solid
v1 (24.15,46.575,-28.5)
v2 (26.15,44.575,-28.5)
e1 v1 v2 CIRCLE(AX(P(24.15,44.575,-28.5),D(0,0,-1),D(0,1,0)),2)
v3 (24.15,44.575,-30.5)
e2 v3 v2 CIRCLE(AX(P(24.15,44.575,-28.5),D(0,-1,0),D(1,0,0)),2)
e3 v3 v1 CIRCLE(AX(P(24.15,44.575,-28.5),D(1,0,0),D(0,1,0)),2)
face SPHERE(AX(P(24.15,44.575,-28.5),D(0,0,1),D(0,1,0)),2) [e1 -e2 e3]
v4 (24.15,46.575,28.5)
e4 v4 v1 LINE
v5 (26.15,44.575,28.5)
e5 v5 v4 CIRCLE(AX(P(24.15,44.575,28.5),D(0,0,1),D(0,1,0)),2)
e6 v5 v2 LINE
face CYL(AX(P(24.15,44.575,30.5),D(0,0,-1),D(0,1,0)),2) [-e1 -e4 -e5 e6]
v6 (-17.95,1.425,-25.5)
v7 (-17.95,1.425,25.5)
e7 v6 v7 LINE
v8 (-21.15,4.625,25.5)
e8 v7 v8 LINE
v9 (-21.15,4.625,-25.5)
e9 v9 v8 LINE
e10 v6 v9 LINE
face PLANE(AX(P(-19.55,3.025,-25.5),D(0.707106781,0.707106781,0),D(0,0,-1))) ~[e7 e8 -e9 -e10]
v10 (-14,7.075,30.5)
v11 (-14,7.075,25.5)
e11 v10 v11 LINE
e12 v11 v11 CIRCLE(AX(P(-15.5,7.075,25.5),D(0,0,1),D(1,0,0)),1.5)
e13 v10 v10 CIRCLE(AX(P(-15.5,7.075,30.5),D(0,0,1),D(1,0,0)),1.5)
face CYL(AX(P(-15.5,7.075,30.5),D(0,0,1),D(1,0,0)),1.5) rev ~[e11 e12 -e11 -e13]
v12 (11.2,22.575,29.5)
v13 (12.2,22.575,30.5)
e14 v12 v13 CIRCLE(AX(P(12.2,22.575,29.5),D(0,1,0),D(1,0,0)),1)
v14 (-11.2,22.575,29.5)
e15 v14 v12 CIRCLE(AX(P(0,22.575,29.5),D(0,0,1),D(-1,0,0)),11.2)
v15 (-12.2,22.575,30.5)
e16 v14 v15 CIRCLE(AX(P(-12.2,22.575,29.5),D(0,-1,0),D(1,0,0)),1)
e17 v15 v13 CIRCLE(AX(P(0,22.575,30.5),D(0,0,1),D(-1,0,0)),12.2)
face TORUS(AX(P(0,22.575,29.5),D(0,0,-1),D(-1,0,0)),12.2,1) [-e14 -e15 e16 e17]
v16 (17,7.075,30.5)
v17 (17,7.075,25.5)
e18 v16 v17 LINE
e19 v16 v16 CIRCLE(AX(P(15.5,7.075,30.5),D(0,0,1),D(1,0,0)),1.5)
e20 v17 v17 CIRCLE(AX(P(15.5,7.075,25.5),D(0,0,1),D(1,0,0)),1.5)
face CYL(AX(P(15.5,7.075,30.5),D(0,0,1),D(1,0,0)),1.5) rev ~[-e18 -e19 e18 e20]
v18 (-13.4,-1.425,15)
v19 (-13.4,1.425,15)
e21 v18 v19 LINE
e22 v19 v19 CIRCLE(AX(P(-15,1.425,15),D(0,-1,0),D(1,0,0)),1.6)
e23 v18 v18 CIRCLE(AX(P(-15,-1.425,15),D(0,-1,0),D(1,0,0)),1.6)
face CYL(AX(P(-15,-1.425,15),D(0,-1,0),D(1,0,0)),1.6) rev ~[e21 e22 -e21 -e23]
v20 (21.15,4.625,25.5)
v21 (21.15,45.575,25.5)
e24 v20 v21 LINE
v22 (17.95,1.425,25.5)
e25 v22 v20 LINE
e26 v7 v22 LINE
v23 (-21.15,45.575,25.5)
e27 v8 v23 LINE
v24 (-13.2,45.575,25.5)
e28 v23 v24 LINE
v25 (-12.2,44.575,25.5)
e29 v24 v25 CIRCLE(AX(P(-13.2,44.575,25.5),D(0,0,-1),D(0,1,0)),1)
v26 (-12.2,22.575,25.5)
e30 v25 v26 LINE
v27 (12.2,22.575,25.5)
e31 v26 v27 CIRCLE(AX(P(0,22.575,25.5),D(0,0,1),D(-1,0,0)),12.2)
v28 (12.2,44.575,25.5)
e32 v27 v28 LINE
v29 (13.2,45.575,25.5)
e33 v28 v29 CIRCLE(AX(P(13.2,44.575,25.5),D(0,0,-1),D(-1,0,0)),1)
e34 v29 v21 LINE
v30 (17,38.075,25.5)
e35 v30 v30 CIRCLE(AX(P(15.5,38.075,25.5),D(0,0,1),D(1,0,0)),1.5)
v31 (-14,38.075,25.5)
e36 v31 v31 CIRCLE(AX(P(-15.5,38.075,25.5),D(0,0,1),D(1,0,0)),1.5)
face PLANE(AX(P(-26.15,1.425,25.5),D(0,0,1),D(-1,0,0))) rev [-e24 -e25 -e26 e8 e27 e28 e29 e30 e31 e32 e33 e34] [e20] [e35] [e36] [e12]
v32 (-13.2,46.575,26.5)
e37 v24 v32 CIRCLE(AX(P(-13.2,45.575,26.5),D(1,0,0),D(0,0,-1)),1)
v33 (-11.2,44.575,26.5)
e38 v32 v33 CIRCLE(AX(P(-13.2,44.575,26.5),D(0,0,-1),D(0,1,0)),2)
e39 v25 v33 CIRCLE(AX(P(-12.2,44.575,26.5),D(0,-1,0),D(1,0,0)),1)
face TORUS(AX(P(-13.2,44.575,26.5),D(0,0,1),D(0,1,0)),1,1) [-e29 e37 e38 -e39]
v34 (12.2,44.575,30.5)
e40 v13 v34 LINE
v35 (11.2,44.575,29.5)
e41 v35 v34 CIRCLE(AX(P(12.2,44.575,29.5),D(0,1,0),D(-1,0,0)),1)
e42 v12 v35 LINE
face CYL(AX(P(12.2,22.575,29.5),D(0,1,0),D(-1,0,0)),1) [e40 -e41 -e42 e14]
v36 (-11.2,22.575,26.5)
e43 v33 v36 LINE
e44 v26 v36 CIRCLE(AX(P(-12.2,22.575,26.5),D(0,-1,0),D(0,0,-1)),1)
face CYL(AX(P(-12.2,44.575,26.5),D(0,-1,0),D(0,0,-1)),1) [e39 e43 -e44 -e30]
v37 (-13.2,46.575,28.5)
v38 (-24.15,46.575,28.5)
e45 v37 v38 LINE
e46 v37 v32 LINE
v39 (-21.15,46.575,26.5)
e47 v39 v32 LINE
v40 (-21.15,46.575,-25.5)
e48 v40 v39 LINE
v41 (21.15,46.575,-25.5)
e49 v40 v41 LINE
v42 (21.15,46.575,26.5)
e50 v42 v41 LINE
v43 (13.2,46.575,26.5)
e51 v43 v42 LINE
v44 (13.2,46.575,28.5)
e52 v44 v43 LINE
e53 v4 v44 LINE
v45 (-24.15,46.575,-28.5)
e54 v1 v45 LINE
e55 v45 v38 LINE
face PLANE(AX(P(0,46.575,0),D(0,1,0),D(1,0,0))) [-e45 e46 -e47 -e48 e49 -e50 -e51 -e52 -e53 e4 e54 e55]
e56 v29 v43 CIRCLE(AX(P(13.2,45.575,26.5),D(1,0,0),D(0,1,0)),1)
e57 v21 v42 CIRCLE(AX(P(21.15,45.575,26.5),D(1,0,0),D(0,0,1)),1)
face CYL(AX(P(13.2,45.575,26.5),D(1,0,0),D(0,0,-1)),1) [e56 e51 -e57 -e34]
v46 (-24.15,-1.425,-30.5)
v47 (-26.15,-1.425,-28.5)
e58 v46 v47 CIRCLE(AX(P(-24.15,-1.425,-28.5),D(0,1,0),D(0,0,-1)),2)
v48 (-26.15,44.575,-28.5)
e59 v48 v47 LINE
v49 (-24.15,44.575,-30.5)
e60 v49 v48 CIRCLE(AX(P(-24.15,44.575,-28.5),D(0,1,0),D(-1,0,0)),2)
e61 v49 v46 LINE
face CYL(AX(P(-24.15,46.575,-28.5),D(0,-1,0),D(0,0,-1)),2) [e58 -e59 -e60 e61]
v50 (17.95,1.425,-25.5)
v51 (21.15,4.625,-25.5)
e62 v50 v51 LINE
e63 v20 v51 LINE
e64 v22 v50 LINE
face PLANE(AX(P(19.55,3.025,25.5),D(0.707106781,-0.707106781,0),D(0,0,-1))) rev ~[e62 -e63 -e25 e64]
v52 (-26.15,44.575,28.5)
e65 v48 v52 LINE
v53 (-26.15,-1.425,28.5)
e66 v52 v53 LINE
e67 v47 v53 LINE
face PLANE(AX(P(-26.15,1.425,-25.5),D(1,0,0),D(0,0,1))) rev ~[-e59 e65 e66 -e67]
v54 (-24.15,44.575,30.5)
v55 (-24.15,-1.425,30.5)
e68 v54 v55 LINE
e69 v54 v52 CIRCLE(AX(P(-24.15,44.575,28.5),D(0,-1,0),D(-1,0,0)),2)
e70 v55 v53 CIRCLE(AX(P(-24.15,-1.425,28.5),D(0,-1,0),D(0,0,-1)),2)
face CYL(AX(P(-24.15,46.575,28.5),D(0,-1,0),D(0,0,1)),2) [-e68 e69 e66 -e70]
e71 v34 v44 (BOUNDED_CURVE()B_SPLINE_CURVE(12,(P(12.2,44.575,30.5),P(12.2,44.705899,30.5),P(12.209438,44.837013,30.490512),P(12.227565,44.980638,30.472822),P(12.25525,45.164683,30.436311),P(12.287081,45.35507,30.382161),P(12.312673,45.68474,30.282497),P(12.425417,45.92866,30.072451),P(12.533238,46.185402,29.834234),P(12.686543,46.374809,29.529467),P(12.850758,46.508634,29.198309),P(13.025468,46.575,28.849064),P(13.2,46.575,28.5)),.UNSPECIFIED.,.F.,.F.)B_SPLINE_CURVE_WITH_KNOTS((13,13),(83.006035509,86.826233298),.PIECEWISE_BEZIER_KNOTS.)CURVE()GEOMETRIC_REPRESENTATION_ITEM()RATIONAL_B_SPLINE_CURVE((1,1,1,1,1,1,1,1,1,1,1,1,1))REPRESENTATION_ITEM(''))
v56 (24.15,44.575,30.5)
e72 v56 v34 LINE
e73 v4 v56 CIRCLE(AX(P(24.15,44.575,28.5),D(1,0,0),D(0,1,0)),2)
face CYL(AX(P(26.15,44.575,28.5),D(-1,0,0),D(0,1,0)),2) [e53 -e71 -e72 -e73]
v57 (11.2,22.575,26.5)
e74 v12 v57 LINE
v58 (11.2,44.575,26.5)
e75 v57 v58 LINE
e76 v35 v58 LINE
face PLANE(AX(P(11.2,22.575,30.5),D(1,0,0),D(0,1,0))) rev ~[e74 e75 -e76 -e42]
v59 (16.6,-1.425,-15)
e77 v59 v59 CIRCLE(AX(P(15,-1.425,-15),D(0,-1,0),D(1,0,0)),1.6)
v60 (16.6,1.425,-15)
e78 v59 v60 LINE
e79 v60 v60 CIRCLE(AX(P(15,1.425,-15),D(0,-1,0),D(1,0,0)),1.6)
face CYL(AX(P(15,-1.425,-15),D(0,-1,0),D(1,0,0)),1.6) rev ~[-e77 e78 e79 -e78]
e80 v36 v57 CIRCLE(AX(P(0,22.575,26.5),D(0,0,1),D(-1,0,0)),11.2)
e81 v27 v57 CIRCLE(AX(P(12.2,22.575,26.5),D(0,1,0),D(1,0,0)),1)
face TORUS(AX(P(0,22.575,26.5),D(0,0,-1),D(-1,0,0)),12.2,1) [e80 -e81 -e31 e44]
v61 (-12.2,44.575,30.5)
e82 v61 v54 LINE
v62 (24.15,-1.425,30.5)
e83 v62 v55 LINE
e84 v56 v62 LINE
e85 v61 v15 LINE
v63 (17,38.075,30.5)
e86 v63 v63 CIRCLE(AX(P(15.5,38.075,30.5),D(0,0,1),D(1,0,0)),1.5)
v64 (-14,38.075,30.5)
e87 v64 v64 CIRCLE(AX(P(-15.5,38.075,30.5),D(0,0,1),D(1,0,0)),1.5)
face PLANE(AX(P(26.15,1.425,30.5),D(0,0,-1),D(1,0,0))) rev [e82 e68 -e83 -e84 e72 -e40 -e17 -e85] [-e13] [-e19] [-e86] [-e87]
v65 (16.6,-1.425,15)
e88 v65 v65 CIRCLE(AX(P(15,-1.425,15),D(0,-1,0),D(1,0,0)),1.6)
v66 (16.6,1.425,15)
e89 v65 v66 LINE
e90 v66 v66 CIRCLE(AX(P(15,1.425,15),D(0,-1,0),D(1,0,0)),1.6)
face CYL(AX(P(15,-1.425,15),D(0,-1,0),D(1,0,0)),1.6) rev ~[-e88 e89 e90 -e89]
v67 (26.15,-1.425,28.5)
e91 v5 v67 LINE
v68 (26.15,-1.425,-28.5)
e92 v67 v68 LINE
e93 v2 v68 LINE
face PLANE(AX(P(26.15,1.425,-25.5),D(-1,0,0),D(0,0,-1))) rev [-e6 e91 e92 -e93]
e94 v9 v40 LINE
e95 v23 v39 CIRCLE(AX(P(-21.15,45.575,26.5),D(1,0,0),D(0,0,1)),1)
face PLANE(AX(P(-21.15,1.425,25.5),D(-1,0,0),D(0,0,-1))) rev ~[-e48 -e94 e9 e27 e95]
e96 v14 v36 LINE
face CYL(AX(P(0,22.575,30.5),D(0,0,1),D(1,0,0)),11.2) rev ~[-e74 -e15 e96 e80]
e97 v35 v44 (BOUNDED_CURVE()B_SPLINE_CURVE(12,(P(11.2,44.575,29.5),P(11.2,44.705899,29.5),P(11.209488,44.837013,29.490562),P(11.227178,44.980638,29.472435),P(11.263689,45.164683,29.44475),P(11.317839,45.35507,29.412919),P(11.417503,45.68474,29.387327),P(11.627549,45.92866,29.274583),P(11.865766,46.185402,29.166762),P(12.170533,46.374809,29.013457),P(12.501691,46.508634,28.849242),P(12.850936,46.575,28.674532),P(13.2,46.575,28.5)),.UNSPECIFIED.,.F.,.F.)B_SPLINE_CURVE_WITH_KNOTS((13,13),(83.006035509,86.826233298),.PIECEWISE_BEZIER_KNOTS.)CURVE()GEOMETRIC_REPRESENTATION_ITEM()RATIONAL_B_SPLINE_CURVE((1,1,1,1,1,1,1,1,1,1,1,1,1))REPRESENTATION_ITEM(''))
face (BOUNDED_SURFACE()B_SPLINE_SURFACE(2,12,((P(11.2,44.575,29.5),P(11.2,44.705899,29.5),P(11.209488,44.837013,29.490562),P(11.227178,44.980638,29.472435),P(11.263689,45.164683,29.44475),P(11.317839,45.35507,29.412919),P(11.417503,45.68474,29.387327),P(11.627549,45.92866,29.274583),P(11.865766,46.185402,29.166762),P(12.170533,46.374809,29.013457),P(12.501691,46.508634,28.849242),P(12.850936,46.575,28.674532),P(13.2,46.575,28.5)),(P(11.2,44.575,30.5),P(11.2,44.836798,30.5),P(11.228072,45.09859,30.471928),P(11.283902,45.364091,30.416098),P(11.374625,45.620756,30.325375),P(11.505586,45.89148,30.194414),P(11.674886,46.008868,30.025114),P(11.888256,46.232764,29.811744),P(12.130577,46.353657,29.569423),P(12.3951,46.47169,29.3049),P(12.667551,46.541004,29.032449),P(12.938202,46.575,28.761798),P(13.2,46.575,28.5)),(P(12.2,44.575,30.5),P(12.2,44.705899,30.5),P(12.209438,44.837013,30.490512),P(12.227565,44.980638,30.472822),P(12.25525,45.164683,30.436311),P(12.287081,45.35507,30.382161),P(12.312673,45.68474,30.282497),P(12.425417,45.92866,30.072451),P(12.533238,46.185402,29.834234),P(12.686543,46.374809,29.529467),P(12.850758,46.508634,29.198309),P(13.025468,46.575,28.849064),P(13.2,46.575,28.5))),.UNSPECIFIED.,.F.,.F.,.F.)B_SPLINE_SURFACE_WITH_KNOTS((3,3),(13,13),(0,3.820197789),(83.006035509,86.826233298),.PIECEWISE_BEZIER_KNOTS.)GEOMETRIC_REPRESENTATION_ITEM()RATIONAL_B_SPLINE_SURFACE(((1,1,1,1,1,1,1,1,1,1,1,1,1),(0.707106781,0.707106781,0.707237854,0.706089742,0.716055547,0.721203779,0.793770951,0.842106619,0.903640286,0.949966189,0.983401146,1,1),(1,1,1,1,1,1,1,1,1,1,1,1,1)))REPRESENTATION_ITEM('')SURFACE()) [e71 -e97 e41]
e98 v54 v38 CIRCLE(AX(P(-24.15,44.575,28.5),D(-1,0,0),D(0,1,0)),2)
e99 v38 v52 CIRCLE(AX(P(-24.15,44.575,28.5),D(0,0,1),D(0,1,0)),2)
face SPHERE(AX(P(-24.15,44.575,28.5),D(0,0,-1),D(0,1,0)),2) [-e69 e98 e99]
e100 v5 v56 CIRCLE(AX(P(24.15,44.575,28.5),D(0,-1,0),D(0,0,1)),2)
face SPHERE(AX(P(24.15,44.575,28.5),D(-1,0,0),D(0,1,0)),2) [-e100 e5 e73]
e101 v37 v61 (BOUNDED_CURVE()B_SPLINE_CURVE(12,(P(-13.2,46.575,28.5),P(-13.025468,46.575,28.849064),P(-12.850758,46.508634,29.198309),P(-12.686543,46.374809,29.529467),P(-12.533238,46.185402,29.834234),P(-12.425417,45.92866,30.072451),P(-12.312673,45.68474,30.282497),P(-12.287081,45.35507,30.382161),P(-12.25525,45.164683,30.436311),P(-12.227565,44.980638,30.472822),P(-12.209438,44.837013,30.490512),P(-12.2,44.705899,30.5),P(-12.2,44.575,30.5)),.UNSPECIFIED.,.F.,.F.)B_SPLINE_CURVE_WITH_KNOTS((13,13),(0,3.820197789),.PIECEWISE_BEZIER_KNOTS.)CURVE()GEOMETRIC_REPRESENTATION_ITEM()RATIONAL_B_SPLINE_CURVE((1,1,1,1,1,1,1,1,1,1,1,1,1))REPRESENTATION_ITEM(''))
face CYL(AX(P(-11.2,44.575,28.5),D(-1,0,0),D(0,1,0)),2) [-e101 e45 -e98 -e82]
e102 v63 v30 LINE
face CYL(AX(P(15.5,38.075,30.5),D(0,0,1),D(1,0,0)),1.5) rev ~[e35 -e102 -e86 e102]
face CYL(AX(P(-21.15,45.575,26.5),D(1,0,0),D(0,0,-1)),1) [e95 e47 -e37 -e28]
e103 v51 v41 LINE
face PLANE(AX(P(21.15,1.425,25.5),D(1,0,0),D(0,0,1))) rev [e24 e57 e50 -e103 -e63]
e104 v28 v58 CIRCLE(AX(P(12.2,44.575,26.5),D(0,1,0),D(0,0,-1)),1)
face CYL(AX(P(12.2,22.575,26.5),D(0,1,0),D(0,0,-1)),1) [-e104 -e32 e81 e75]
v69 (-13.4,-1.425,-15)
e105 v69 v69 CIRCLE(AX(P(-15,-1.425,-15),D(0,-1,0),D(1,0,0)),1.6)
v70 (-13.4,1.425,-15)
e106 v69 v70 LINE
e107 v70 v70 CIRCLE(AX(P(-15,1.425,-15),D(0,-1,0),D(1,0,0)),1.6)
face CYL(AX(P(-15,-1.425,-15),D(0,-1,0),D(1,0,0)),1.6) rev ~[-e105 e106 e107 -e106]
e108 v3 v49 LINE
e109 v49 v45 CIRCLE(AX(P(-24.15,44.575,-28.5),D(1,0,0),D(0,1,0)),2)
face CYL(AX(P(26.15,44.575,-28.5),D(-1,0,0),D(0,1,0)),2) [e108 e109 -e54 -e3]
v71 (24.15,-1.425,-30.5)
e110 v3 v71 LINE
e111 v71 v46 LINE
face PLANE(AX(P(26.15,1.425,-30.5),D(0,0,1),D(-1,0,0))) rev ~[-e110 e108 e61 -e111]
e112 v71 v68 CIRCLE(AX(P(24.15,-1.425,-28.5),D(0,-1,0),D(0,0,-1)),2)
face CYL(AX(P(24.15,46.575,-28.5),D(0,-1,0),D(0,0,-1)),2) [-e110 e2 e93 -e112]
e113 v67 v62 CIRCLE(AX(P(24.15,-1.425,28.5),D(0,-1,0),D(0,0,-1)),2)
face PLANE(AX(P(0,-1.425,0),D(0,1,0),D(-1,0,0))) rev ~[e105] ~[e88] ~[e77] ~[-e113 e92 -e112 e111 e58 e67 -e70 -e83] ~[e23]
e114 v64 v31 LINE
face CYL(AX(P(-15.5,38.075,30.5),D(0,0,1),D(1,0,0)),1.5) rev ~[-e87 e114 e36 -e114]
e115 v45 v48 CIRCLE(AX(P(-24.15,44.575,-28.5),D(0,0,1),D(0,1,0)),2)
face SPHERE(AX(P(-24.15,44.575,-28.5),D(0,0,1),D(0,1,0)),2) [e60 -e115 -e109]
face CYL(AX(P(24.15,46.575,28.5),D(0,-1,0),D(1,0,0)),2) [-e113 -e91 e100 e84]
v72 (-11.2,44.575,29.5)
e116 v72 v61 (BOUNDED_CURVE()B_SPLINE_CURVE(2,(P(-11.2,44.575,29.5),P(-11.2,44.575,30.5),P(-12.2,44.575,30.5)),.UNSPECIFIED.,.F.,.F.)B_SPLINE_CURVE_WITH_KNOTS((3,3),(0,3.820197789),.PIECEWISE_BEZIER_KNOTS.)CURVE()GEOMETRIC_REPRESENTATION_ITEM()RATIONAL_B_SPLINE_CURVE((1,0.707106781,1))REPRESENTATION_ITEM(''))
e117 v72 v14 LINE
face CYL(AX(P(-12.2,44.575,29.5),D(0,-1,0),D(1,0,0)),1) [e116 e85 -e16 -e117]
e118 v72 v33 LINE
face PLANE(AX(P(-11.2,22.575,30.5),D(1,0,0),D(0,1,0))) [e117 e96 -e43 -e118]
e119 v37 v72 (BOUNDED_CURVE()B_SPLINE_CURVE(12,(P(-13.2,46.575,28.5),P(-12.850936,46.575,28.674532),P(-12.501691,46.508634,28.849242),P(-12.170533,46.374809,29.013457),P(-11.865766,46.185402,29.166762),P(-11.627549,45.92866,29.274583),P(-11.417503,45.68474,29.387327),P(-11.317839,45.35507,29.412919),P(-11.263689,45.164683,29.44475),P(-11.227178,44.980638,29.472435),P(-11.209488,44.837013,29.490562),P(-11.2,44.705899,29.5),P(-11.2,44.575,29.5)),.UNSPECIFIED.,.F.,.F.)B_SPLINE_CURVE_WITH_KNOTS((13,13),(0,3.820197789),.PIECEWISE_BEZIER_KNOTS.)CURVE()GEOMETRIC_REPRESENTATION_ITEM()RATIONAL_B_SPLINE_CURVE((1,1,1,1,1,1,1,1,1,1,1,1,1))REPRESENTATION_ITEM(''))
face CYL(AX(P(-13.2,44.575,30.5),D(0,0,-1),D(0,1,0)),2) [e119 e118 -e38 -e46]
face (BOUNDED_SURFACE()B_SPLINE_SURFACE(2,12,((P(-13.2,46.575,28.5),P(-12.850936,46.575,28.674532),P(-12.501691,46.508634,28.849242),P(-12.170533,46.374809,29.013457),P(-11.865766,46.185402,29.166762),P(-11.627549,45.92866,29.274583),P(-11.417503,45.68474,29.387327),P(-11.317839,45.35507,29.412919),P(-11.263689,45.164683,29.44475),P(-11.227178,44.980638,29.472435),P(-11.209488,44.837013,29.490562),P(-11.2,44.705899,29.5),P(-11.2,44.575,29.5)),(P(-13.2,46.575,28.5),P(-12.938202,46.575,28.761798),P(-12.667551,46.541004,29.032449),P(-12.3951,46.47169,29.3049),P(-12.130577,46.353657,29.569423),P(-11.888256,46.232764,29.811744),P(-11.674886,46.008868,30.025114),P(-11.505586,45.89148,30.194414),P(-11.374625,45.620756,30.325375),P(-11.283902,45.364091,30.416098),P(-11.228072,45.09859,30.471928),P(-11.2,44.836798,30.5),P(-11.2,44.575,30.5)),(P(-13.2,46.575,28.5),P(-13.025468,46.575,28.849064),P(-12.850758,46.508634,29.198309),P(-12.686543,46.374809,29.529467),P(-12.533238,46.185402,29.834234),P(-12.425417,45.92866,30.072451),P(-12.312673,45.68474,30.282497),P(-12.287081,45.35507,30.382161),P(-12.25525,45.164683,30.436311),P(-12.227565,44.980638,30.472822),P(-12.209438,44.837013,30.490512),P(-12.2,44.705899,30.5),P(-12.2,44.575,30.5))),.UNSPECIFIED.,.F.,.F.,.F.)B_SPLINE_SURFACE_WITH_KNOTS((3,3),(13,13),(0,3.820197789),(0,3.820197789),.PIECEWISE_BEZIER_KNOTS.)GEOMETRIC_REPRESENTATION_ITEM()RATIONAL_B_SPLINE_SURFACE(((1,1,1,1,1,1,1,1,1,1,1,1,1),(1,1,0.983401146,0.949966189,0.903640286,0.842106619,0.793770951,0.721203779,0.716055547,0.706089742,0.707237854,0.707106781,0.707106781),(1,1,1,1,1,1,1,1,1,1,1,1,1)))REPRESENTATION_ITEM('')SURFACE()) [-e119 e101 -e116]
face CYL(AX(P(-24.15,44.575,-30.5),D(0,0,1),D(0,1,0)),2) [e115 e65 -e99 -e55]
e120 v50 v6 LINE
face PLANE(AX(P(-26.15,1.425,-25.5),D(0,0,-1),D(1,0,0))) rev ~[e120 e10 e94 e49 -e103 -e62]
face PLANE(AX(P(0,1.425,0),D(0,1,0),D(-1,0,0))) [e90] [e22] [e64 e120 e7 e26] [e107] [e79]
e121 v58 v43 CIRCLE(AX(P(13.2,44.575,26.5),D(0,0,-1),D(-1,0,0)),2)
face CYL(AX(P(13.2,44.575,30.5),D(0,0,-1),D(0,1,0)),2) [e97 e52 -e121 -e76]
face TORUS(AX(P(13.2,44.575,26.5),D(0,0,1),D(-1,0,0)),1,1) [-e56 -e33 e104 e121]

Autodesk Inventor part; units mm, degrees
sketch "Эскиз1" plane through (0, 0, 0) normal (0, 1, 0) x (-1, 0, 0)
  line L0 (21.15, 25.5) -> (-21.15, 25.5)
  line L1 (-21.15, 25.5) -> (-21.15, -25.5)
  line L2 (-21.15, -25.5) -> (21.15, -25.5)
  line L3 (21.15, -25.5) -> (21.15, 25.5)
  line L4 (21.15, 25.5) -> (-21.15, -25.5) construction
  line L5 (-21.15, 25.5) -> (21.15, -25.5) construction
  point P0 (0, 0)
  dimension "d2" = 51
  dimension "d3" = 42.3
extrude "Выдавливание1" add sketch "Эскиз1" along normal mid plane 2.85
sketch "Эскиз2" plane through (0, 1.425, 0) normal (0, 1, 0) x (1, 0, 0)
  line L0 (-21.15, -25.5) -> (-21.15, 25.5) projected
  line L1 (-21.15, 25.5) -> (-26.15, 25.5)
  line L2 (-26.15, 25.5) -> (-26.15, -25.5)
  line L3 (-26.15, -25.5) -> (-21.15, -25.5)
  line L4 (-21.15, -25.5) -> (-21.15, 25.5)
  point P0 (0, 0)
  dimension "d4" = 5
extrude "Выдавливание2" add sketch "Эскиз2" along normal blind 45.15 and the other way blind 2.85
mirror "Зеркальное отражение1" about plane through (0, 0, 0) normal (1, 0, 0) of "Выдавливание2"
chamfer "Фаска1" distance 3.2 angle 45 2 edges at (-21.15, 1.425, 0) (21.15, 1.425, 0)
sketch "Эскиз3" plane through (0, 1.425, 0) normal (0, 1, 0) x (1, 0, 0)
  line L0 (-26.15, 25.5) -> (26.15, 25.5) projected
  line L1 (-26.15, 25.5) -> (26.15, 25.5)
  line L2 (26.15, 25.5) -> (26.15, 30.5)
  line L3 (26.15, 30.5) -> (-26.15, 30.5)
  line L4 (-26.15, 30.5) -> (-26.15, 25.5)
  point P0 (0, 0)
  dimension "d17" = 5
extrude "Выдавливание3" add sketch "Эскиз3" along normal blind 45.15 and the other way blind 2.85
mirror "Зеркальное отражение2" about plane through (0, 0, 0) normal (0, 0, 1) of "Выдавливание3"
sketch "Эскиз7" plane through (-26.15, -1.425, 30.5) normal (0, 0, 1) x (1, 0, 0)
  circle A0 centre (26.15, 24) radius 11 projected
  circle A1 centre (26.15, 24) radius 11.2
  point P0 (26.15, 1.425)
  dimension "d22" = 22.4
extrude "Выдавливание5" cut sketch "Эскиз7" against normal up to next contours A0 | A1
sketch "Эскиз8" plane through (-26.15, -1.425, 30.5) normal (0, 0, 1) x (1, 0, 0)
  circle A0 centre (26.15, 24) radius 11.2 projected
  line L0 (14.95, 24) -> (14.95, 48)
  line L1 (5, 48) -> (47.3, 48) projected
  line L2 (37.35, 24) -> (37.35, 48.1316)
  point P0 (26.15, 1.425)
  point P1 (37.35, 48)
  dimension "d23" = 22.4
extrude "Выдавливание6" cut sketch "Эскиз8" against normal up to next contours A0 L0 L1 L2
fillet "Сопряжение1" radius 2 11 edges at (-11.2, 46.575, 28) (11.2, 46.575, 28) (-26.15, 46.575, 0) (-18.675, 46.575, 30.5) (18.675, 46.575, 30.5) (26.15, 46.575, 0) (0, 46.575, -30.5) (26.15, 22.575, 30.5) (-26.15, 22.575, 30.5) (-26.15, 22.575, -30.5) (26.15, 22.575, -30.5)
fillet "Сопряжение2" radius 1 12 edges at (0, 11.375, 25.5) (11.2, 33.575, 25.5) (11.7858, 45.9892, 25.5) (17.175, 46.575, 25.5) (-11.7858, 45.9892, 25.5) (-17.175, 46.575, 25.5) (-11.2, 33.575, 25.5) (-11.7858, 45.9892, 29.9142) (0, 11.375, 30.5) (11.2, 33.575, 30.5) (11.7858, 45.9892, 29.9142) (-11.2, 33.575, 30.5)
sketch "Эскиз9" plane through (-24.15, -1.425, 30.5) normal (0, 0, 1) x (1, 0, 0)
  circle A0 centre (8.65, 39.5) radius 1.5
  circle A1 centre (39.65, 39.5) radius 1.5
  circle A2 centre (39.65, 8.5) radius 1.5
  circle A3 centre (8.65, 8.5) radius 1.5
  line L0 (8.65, 39.5) -> (39.65, 39.5) construction
  line L1 (39.65, 39.5) -> (39.65, 8.5) construction
  line L2 (39.65, 8.5) -> (8.65, 8.5) construction
  line L3 (8.65, 8.5) -> (8.65, 39.5) construction
  arc A4 (12.95, 24) -> (35.35, 24) centre (24.15, 24) ccw projected
  line L4 (8.65, 39.5) -> (39.65, 8.5) construction
  line L5 (39.65, 39.5) -> (8.65, 8.5) construction
  line L6 (24.15, 62.1506) -> (24.15, -10.3584) projected
  point P0 (24.15, 1.425)
  point P1 (24.15, 24)
  point P2 (24.15, 24)
  dimension "d28" = 3
  dimension "d29" = 31
extrude "Выдавливание7" cut sketch "Эскиз9" against normal up to next
sketch "Эскиз10" plane through (0, -1.425, 0) normal (0, -1, 0) x (1, 0, 0)
  line L0 (15, -15) -> (-15, -15) construction
  line L1 (-15, -15) -> (-15, 15) construction
  line L2 (-15, 15) -> (15, 15) construction
  line L3 (15, 15) -> (15, -15) construction
  line L4 (15, -15) -> (-15, 15) construction
  line L5 (-15, -15) -> (15, 15) construction
  circle A0 centre (-15, -15) radius 1.6
  circle A1 centre (-15, 15) radius 1.6
  circle A2 centre (15, -15) radius 1.6
  circle A3 centre (15, 15) radius 1.6
  point P0 (0, 0)
  dimension "d32" = 30
  dimension "d33" = 3.2
extrude "Выдавливание8" cut sketch "Эскиз10" against normal up to next
properties part number "Крепление_мотора"
